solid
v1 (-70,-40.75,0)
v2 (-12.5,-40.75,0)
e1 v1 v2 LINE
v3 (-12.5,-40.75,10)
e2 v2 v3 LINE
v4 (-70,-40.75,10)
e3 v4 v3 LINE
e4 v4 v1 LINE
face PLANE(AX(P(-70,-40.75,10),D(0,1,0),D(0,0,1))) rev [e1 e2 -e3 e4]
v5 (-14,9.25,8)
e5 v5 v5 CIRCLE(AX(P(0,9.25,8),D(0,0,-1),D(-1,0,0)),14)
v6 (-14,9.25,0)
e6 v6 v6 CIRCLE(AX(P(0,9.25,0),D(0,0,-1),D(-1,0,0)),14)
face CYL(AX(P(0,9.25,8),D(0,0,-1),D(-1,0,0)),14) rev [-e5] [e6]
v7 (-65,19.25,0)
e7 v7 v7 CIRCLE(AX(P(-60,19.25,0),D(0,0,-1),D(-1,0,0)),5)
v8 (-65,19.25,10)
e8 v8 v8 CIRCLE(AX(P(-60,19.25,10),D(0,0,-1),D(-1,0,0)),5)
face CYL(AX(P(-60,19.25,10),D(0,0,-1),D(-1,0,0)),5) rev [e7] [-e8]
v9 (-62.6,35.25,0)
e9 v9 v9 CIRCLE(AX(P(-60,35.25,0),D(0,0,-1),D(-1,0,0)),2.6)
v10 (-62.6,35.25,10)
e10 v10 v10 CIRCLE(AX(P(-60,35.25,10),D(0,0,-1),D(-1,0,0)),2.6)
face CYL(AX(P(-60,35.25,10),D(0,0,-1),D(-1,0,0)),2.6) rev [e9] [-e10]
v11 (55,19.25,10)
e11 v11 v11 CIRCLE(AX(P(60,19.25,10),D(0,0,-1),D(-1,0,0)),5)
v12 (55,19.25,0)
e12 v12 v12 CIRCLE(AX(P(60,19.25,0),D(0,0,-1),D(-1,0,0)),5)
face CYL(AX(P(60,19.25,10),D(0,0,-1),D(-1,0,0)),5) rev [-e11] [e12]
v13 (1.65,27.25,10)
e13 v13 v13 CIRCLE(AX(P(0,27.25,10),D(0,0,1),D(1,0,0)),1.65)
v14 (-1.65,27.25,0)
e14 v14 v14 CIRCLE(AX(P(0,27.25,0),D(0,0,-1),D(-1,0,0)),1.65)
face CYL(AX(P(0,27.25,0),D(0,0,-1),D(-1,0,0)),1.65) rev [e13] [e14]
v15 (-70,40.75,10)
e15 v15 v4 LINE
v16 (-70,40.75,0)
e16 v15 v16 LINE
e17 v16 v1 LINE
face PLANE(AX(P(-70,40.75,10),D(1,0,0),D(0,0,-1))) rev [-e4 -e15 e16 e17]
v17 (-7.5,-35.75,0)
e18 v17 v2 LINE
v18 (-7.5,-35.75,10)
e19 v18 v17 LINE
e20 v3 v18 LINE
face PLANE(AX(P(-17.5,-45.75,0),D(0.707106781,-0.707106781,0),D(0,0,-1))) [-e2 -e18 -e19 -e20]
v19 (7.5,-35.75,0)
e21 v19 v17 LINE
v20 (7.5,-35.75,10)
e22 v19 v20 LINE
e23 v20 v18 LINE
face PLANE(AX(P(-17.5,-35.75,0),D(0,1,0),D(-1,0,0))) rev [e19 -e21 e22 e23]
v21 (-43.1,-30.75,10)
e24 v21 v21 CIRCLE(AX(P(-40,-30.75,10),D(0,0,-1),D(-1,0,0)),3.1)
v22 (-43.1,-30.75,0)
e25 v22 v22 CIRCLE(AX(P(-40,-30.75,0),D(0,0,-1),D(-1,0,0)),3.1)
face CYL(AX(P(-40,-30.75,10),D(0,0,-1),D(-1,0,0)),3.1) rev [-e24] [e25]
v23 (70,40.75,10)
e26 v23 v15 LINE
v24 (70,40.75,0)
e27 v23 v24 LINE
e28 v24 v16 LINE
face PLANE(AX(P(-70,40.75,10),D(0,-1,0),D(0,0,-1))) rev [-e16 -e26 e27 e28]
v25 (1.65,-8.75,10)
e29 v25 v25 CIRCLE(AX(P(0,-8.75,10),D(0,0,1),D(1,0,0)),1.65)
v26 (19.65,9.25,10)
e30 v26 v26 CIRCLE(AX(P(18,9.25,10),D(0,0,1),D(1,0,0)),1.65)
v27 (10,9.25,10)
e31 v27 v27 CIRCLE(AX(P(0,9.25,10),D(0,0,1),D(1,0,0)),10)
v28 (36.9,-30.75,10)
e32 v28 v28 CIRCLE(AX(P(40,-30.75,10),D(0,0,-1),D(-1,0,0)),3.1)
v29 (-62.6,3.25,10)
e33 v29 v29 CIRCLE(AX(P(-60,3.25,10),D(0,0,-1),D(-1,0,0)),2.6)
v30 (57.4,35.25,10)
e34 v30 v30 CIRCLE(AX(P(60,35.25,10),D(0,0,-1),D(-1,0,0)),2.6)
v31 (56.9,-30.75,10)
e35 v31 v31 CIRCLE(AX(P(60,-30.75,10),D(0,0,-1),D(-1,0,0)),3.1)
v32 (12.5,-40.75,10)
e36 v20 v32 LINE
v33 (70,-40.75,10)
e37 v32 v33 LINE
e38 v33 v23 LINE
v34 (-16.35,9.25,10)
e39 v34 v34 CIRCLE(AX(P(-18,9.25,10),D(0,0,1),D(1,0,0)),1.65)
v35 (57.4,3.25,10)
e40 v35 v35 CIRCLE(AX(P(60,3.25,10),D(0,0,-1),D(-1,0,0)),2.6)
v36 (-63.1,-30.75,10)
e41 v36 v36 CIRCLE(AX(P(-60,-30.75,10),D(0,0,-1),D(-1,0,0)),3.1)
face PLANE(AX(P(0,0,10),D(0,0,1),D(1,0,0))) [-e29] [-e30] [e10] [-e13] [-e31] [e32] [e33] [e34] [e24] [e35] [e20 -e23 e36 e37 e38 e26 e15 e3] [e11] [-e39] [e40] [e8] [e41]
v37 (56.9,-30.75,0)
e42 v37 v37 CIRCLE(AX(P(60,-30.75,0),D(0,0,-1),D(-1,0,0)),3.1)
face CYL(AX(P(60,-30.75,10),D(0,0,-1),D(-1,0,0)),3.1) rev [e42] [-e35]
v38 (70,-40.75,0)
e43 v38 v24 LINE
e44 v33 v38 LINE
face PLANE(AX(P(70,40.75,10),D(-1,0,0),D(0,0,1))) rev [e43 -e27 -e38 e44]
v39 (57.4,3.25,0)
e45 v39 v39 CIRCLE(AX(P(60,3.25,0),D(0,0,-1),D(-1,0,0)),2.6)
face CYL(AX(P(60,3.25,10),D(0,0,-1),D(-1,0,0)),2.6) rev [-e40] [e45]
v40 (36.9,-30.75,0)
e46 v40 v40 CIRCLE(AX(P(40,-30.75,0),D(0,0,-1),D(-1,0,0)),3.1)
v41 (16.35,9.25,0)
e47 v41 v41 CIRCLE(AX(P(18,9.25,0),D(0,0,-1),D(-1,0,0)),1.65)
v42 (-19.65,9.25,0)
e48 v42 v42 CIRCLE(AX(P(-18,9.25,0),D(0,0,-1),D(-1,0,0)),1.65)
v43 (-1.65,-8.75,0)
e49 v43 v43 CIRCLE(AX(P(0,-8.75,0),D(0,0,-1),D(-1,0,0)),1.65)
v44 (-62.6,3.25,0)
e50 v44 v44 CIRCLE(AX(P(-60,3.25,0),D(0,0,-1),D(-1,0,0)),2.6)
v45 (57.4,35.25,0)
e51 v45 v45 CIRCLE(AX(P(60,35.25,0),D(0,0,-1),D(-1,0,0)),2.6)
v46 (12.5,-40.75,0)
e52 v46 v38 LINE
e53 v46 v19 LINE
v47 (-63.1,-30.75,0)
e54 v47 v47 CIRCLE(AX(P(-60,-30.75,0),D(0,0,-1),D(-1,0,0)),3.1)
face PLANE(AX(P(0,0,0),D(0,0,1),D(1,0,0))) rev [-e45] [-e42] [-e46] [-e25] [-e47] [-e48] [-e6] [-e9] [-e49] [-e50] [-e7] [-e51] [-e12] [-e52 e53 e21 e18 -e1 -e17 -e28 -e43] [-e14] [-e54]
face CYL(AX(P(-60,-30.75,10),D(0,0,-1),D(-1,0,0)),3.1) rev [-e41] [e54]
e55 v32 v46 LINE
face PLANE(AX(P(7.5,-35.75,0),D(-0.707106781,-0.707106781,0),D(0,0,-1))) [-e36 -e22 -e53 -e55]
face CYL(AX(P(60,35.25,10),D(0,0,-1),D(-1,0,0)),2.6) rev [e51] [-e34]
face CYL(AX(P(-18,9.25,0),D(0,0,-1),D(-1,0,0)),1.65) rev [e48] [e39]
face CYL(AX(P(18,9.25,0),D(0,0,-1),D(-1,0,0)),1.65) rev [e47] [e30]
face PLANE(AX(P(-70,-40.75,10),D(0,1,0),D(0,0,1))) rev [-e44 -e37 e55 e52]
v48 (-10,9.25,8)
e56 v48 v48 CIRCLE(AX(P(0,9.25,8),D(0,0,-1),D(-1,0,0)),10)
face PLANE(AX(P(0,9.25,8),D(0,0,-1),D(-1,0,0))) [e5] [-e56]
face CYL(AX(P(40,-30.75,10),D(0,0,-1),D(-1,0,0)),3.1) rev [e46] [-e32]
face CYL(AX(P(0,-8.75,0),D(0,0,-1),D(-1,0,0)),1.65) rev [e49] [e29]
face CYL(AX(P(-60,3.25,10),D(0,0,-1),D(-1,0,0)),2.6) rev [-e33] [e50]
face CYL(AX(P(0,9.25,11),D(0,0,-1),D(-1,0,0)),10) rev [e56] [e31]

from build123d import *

# Parameters (mm, degrees)
SKETCH1_W           = 140
SKETCH1_H           = 81.5
BOSS_EXTRUDE1_DEPTH = 10
SKETCH2_R           = 14
CUT_EXTRUDE2_DEPTH  = 8
SKETCH5_R           = 5
SKETCH5_R_2         = 2.6
SKETCH5_R_3         = 3.1
CUT_EXTRUDE4_DEPTH  = 82.612269298
SKETCH25_W          = 35
SKETCH25_H          = 5
CUT_EXTRUDE6_DEPTH  = 82.612269298
CHAMFER2_SIZE       = 10
SKETCH27_R          = 10
CUT_EXTRUDE8_DEPTH  = 3
CIRPATTERN1_COUNT   = 4


with BuildPart() as part:
    # Sketch1 → Boss-Extrude1 (new body)
    with BuildSketch(Plane.XY):
        Rectangle(SKETCH1_W, SKETCH1_H)
    extrude(amount=BOSS_EXTRUDE1_DEPTH)

    # Sketch2 → Cut-Extrude2 (cut)
    with BuildSketch(Plane(origin=(0, 0, 0), x_dir=(-1, 0, 0), z_dir=(0, 0, -1))):
        with Locations((0, 9.25)):
            Circle(SKETCH2_R)
    extrude(amount=-CUT_EXTRUDE2_DEPTH, mode=Mode.SUBTRACT)

    # Sketch5 → Cut-Extrude4 (cut, through all)
    with BuildSketch(Plane(origin=(0, 0, 0), x_dir=(-1, 0, 0), z_dir=(0, 0, -1))):
        with Locations((-60, 19.25)):
            Circle(SKETCH5_R)
        with Locations((60, 19.25)):
            Circle(SKETCH5_R)
        with Locations((-60, 35.25)):
            Circle(SKETCH5_R_2)
        with Locations((-60, 3.25)):
            Circle(SKETCH5_R_2)
        with Locations((60, 35.25)):
            Circle(SKETCH5_R_2)
        with Locations((60, 3.25)):
            Circle(SKETCH5_R_2)
        with Locations((-60, -30.75)):
            Circle(SKETCH5_R_3)
        with Locations((-40, -30.75)):
            Circle(SKETCH5_R_3)
        with Locations((40, -30.75)):
            Circle(SKETCH5_R_3)
        with Locations((60, -30.75)):
            Circle(SKETCH5_R_3)
    extrude(amount=-CUT_EXTRUDE4_DEPTH, mode=Mode.SUBTRACT)

    # Sketch25 → Cut-Extrude6 (cut, through all)
    with BuildSketch(Plane.XY.offset(10)):
        with Locations((0, -38.25)):
            Rectangle(SKETCH25_W, SKETCH25_H)
    extrude(amount=-CUT_EXTRUDE6_DEPTH, mode=Mode.SUBTRACT)

    # Chamfer2
    # the kernel refuses this chamfer: 10 mm, written as the material it adds along each edge
    with BuildSketch(Plane(origin=(17.5, -35.75, 10), x_dir=(-0.9996219169112968, 0.027495876610586317, 0), z_dir=(0, 0, -1))) as chamfer2_piece_1_section:
        Polygon((CHAMFER2_SIZE * 0.999621916911, -CHAMFER2_SIZE * 0.0274958766106), (-CHAMFER2_SIZE * 0.0274958766106, -CHAMFER2_SIZE * 0.999621916911), (0, 0), align=None)
    chamfer2_piece_1 = extrude(amount=10, mode=Mode.PRIVATE)
    chamfer2_piece_1 = split(chamfer2_piece_1, bisect_by=Plane(origin=(13.565989159, -40.75, 5), z_dir=(0, 1, 0)), keep=Keep.TOP, mode=Mode.PRIVATE)
    add(chamfer2_piece_1)
    with BuildSketch(Plane(origin=(-17.5, -35.75, 10), x_dir=(-0.027495876610586317, -0.9996219169112968, 0), z_dir=(0, 0, -1))) as chamfer2_piece_2_section:
        Polygon((CHAMFER2_SIZE * 0.999621916911, -CHAMFER2_SIZE * 0.0274958766106), (-CHAMFER2_SIZE * 0.0274958766106, -CHAMFER2_SIZE * 0.999621916911), (0, 0), align=None)
    chamfer2_piece_2 = extrude(amount=10, mode=Mode.PRIVATE)
    chamfer2_piece_2 = split(chamfer2_piece_2, bisect_by=Plane(origin=(-13.565989159, -40.75, 5), z_dir=(0, 1, 0)), keep=Keep.TOP, mode=Mode.PRIVATE)
    add(chamfer2_piece_2)

    # Sketch27 → Cut-Extrude8 (cut)
    with BuildSketch(Plane(origin=(0, 0, 8), x_dir=(-1, 0, 0), z_dir=(0, 0, -1))):
        with Locations((0, 9.25)):
            Circle(SKETCH27_R)
    extrude(amount=-CUT_EXTRUDE8_DEPTH, mode=Mode.SUBTRACT)

    # Sketch30 → M4 Tapped Hole1 (revolve, cut)
    with BuildSketch(Plane(origin=(0, 27.25, 0), x_dir=(0, 1, 0), z_dir=(1, 0, 0))):
        Polygon((0, 0), (0, 11.091420021), (1.65, 10.1), (1.65, 0), align=None)
    m4_tapped_hole1 = revolve(axis=Axis((0, 27.25, -6.35), (0, 0, 1)), mode=Mode.SUBTRACT)

    # CirPattern1: M4 Tapped Hole1 ×4 about axis
    cirpattern1_axis = Axis((0, 9.25, 0), (0, 0, 1))
    for i in range(1, CIRPATTERN1_COUNT):
        add(m4_tapped_hole1.rotate(cirpattern1_axis, i * 360 / CIRPATTERN1_COUNT), mode=Mode.SUBTRACT)


solid = part.part
